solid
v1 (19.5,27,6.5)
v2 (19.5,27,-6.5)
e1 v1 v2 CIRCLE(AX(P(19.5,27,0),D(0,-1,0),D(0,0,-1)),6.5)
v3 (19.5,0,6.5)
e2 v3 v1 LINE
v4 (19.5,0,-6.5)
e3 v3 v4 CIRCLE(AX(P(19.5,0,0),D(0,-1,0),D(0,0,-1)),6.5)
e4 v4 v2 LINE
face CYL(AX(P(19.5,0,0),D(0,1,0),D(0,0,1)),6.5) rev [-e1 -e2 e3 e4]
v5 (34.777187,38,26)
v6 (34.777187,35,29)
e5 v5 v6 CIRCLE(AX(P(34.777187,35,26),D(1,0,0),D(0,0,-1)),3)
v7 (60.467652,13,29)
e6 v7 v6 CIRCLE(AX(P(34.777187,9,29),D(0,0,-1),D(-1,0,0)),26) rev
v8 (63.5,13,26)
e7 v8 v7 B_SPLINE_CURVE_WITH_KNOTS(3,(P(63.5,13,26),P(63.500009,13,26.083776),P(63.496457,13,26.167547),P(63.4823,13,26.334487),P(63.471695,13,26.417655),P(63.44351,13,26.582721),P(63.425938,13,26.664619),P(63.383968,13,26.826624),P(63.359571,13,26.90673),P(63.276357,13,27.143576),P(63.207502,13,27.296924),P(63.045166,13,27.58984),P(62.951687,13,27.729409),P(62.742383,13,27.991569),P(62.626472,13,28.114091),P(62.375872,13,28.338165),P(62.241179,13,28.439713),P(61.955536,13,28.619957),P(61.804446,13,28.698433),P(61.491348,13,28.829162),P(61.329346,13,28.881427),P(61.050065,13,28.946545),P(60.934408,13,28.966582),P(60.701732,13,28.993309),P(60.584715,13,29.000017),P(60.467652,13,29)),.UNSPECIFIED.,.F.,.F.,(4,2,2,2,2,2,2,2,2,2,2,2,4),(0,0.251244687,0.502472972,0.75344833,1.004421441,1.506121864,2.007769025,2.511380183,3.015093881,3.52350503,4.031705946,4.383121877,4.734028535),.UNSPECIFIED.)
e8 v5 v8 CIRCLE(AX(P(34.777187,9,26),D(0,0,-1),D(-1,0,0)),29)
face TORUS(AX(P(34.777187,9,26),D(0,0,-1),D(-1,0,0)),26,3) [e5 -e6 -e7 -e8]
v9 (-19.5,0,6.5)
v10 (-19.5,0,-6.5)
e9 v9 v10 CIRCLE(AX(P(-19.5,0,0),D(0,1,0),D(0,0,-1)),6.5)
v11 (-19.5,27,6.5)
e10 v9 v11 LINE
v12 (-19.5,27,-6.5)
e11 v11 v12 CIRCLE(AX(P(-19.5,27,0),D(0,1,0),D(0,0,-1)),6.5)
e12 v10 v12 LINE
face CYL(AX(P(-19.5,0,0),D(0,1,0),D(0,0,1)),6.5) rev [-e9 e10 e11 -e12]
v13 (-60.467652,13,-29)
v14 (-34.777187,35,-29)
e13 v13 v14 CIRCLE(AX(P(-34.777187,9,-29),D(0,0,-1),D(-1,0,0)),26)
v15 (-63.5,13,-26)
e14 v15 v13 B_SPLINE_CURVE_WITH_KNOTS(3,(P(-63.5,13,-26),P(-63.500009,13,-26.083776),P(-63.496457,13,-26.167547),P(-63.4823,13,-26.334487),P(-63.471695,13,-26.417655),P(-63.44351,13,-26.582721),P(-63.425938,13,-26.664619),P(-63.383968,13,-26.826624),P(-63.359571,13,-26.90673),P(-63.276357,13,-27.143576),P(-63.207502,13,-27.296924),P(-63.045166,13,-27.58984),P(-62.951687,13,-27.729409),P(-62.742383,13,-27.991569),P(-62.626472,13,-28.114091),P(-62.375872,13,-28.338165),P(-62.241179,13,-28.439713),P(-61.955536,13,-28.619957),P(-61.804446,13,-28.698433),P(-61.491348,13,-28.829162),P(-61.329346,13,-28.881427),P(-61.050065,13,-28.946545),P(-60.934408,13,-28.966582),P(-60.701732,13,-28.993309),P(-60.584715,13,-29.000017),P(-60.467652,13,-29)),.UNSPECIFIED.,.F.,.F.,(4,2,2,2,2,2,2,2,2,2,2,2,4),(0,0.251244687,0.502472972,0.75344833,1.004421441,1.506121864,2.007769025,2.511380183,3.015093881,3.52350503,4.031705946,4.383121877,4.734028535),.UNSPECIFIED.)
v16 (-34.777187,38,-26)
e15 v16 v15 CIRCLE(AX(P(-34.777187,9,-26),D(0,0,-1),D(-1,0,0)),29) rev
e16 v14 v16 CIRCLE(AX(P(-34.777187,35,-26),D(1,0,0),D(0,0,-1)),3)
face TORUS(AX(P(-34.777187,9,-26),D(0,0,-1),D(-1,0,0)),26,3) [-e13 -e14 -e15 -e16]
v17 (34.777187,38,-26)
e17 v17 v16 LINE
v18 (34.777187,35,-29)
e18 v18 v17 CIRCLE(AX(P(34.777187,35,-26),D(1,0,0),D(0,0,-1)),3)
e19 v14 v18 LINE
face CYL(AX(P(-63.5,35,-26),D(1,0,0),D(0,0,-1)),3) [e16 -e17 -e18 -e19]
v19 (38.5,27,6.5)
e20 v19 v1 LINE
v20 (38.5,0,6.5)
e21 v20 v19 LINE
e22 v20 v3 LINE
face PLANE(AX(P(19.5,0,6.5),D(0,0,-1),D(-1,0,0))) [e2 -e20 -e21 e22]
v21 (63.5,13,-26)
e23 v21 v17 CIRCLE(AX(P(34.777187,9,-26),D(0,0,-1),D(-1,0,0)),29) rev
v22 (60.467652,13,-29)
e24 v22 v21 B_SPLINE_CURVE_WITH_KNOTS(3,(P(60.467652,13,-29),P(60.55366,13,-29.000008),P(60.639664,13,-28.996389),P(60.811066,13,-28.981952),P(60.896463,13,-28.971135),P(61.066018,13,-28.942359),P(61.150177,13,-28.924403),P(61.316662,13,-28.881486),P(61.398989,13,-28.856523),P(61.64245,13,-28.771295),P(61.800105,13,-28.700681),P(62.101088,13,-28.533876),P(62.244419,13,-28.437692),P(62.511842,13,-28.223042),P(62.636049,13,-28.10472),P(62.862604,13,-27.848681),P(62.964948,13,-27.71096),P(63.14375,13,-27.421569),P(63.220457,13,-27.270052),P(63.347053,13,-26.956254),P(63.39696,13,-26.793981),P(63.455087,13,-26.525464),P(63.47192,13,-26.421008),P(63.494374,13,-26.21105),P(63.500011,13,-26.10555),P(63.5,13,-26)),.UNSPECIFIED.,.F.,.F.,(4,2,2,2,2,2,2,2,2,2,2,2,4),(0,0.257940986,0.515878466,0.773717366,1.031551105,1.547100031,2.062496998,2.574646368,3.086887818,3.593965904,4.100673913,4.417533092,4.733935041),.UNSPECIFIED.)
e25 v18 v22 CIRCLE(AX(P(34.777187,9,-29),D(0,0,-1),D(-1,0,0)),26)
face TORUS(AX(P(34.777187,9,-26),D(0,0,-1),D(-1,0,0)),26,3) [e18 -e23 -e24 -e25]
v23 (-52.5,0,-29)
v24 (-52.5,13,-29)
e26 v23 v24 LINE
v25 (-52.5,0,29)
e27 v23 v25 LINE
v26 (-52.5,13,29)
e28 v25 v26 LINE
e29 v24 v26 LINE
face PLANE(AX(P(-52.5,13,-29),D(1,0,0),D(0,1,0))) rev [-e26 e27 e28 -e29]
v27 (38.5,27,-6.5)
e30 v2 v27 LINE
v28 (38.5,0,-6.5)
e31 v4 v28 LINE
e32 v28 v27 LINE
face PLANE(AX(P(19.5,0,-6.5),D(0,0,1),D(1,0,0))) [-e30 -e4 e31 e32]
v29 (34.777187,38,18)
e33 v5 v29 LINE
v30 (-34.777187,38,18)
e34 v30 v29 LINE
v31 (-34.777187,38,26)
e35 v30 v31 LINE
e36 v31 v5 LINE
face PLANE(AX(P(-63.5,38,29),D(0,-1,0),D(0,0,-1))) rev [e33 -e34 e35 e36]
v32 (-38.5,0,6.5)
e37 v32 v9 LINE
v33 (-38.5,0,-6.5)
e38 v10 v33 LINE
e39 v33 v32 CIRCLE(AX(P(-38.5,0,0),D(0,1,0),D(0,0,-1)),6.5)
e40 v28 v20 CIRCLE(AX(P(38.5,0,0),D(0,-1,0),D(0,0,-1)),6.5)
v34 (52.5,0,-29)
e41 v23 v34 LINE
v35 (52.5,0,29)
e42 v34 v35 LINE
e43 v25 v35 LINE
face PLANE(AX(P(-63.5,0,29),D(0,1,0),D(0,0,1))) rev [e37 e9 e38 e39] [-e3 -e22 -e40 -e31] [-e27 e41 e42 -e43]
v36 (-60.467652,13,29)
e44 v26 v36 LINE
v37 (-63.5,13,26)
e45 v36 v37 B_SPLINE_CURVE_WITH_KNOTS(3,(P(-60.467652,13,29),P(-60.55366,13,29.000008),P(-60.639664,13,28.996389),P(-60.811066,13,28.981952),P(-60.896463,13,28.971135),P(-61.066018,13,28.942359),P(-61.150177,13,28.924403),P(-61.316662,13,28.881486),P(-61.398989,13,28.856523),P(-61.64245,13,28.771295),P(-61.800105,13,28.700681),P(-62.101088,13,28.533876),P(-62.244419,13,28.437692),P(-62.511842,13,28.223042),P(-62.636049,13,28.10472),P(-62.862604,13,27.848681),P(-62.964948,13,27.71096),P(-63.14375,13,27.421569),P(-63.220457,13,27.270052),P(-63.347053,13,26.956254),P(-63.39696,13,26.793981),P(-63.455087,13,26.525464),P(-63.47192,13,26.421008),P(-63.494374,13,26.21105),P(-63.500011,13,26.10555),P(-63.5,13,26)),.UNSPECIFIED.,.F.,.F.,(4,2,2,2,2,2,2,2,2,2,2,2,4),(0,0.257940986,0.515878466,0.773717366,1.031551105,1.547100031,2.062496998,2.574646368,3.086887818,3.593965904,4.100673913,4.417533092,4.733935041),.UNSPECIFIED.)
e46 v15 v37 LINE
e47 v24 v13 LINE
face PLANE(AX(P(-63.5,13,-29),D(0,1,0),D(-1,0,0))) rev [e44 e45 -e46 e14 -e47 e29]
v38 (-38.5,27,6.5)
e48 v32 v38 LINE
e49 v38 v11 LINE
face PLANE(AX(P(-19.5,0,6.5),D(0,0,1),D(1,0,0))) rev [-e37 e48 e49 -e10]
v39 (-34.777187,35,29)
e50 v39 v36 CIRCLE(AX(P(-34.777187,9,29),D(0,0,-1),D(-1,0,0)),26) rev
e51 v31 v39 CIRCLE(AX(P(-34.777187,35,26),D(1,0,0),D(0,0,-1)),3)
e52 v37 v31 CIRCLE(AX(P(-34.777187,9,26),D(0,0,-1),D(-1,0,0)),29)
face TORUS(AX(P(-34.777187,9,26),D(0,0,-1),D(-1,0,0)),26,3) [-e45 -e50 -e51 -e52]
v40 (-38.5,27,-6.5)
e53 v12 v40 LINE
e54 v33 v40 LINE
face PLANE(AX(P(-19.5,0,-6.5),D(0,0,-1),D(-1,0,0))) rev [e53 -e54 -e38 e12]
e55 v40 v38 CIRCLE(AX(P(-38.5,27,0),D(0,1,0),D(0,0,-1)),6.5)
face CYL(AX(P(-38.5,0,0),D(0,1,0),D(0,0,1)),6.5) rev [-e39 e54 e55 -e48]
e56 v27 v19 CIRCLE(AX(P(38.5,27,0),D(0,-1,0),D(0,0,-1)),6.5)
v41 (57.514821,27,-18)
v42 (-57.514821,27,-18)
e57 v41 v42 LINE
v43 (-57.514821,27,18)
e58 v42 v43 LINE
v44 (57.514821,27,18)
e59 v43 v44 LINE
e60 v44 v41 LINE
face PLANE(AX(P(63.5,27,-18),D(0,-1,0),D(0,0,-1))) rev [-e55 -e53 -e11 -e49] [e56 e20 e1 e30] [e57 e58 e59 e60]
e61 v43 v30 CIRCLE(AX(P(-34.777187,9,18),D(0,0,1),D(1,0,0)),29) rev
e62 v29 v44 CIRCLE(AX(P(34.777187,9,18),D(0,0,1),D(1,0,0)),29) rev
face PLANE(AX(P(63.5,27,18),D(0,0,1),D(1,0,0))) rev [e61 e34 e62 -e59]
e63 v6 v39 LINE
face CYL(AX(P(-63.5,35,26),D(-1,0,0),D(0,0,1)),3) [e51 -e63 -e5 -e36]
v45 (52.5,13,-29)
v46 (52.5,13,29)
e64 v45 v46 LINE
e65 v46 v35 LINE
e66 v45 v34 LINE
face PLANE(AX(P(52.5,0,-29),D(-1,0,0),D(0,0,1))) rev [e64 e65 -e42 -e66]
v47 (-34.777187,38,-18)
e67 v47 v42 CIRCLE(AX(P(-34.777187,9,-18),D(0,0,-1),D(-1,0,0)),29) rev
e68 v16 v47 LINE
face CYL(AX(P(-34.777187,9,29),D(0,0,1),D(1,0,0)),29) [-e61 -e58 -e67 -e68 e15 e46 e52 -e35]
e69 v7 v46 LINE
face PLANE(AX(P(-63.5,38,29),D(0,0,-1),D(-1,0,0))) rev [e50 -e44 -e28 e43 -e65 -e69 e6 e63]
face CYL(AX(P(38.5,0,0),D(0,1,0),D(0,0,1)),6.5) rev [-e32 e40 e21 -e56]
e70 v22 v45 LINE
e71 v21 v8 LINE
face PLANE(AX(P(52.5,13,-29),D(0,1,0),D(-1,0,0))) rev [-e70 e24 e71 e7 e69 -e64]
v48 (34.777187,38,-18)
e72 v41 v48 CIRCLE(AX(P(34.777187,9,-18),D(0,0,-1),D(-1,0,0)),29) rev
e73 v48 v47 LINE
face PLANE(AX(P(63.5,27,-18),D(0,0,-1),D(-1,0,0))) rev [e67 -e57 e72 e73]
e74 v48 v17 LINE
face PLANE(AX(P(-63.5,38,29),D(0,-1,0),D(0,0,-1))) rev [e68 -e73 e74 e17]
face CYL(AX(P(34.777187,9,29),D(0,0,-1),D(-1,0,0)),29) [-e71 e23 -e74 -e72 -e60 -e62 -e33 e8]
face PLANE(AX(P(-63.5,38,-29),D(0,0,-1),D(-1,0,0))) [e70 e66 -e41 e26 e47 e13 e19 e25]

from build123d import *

# Parameters (mm, degrees)
ESQUISSE1_W             = 127
ESQUISSE1_H             = 38
BASE_EXTRUSION_DEPTH    = 29
ESQUISSE2_W             = 11
ESQUISSE2_H             = 13
ENL_V_MAT_EXTRU_1_DEPTH = 95.022603665
CONG_1_R                = 29
ESQUISSE3_W             = 127
ESQUISSE3_H             = 36
ENL_V_MAT_EXTRU_2_DEPTH = 11
ENL_V_MAT_EXTRU_3_DEPTH = 75.848179671
CONG_2_R                = 3


with BuildPart() as part:
    # Esquisse1 → Base-Extrusion (new, symmetric)
    with BuildSketch(Plane.XY):
        with Locations((0, 19)):
            Rectangle(ESQUISSE1_W, ESQUISSE1_H)
    extrude(amount=BASE_EXTRUSION_DEPTH, both=True)

    # Esquisse2 → Enlèv. mat.-Extru.1 (cut, through all)
    with BuildSketch(Plane.XY.offset(29)):
        with Locations((-58, 6.5)):
            Rectangle(ESQUISSE2_W, ESQUISSE2_H)
        with Locations((58, 6.5)):
            Rectangle(ESQUISSE2_W, ESQUISSE2_H)
    extrude(amount=-ENL_V_MAT_EXTRU_1_DEPTH, mode=Mode.SUBTRACT)

    # Congé1
    # the kernel refuses this fillet: 29 mm, written as the material it takes off along each edge
    with BuildSketch(Plane(origin=(-63.5, 38, 100.807033082), x_dir=(0, -1, 0), z_dir=(0, 0, -1))) as cong_1_piece_1:
        with BuildLine():
            CenterArc((29, -28.722813233), CONG_1_R, 97.928141766, 82.071858234)
            Line((0, -28.722813233), (-0.58, -28.722813233))
            Line((-0.58, -28.722813233), (-0.58, 0))
            Line((-0.58, 0), (0, 0.58))
            ThreePointArc((0, 0.58), (12.5, 0.58), (24.92, 0.574456265))
            Line((24.92, 0.574456265), (25, 0))
        make_face()
    extrude(amount=201.614066163, mode=Mode.SUBTRACT)
    with BuildSketch(Plane(origin=(63.5, 38, -100.807033082), x_dir=(-1, 0, 0), z_dir=(0, 0, 1))) as cong_1_piece_2:
        with BuildLine():
            CenterArc((28.722813233, 29), CONG_1_R, 187.928141766, 82.071858234)
            Line((0, 25), (-0.574456265, 24.92))
            ThreePointArc((-0.574456265, 24.92), (-0.58, 12.5), (-0.58, 0))
            Line((-0.58, 0), (0, -0.58))
            Line((0, -0.58), (28.722813233, -0.58))
            Line((28.722813233, -0.58), (28.722813233, 0))
        make_face()
    extrude(amount=201.614066163, mode=Mode.SUBTRACT)

    # Esquisse3 → Enlèv. mat.-Extru.2 (cut)
    with BuildSketch(Plane(origin=(0, 38, 0), x_dir=(-1, 0, 0), z_dir=(0, 1, 0))):
        Rectangle(ESQUISSE3_W, ESQUISSE3_H)
    extrude(amount=-ENL_V_MAT_EXTRU_2_DEPTH, mode=Mode.SUBTRACT)

    # Esquisse4 → Enlèv. mat.-Extru.3 (cut, through all)
    with BuildSketch(Plane(origin=(0, 27, 0), x_dir=(-1, 0, 0), z_dir=(0, 1, 0))):
        with BuildLine():
            Line((19.5, -6.5), (38.5, -6.5))
            ThreePointArc((38.5, -6.5), (45, 0), (38.5, 6.5))
            Line((38.5, 6.5), (19.5, 6.5))
            ThreePointArc((19.5, 6.5), (13, 0), (19.5, -6.5))
        make_face()
    enl_v_mat_extru_3 = extrude(amount=-ENL_V_MAT_EXTRU_3_DEPTH, mode=Mode.SUBTRACT)

    # Symétrie1: Enlèv. mat.-Extru.3 across plane
    add(enl_v_mat_extru_3.mirror(Plane(origin=(0, 0, 0), x_dir=(0, 0, 1), z_dir=(1, 0, 0))), mode=Mode.SUBTRACT)

    # Congé2
    cong_2_edges = [part.edges().sort_by_distance(p)[0] for p in [
        (0, 38, -29),
        (53.816619532, 30.874642854, -29),
        (-53.816619532, 30.874642854, -29),
        (0, 38, 29),
        (53.816619532, 30.874642854, 29),
        (-53.816619532, 30.874642854, 29),
    ]]
    fillet(cong_2_edges, radius=CONG_2_R)


solid = part.part
